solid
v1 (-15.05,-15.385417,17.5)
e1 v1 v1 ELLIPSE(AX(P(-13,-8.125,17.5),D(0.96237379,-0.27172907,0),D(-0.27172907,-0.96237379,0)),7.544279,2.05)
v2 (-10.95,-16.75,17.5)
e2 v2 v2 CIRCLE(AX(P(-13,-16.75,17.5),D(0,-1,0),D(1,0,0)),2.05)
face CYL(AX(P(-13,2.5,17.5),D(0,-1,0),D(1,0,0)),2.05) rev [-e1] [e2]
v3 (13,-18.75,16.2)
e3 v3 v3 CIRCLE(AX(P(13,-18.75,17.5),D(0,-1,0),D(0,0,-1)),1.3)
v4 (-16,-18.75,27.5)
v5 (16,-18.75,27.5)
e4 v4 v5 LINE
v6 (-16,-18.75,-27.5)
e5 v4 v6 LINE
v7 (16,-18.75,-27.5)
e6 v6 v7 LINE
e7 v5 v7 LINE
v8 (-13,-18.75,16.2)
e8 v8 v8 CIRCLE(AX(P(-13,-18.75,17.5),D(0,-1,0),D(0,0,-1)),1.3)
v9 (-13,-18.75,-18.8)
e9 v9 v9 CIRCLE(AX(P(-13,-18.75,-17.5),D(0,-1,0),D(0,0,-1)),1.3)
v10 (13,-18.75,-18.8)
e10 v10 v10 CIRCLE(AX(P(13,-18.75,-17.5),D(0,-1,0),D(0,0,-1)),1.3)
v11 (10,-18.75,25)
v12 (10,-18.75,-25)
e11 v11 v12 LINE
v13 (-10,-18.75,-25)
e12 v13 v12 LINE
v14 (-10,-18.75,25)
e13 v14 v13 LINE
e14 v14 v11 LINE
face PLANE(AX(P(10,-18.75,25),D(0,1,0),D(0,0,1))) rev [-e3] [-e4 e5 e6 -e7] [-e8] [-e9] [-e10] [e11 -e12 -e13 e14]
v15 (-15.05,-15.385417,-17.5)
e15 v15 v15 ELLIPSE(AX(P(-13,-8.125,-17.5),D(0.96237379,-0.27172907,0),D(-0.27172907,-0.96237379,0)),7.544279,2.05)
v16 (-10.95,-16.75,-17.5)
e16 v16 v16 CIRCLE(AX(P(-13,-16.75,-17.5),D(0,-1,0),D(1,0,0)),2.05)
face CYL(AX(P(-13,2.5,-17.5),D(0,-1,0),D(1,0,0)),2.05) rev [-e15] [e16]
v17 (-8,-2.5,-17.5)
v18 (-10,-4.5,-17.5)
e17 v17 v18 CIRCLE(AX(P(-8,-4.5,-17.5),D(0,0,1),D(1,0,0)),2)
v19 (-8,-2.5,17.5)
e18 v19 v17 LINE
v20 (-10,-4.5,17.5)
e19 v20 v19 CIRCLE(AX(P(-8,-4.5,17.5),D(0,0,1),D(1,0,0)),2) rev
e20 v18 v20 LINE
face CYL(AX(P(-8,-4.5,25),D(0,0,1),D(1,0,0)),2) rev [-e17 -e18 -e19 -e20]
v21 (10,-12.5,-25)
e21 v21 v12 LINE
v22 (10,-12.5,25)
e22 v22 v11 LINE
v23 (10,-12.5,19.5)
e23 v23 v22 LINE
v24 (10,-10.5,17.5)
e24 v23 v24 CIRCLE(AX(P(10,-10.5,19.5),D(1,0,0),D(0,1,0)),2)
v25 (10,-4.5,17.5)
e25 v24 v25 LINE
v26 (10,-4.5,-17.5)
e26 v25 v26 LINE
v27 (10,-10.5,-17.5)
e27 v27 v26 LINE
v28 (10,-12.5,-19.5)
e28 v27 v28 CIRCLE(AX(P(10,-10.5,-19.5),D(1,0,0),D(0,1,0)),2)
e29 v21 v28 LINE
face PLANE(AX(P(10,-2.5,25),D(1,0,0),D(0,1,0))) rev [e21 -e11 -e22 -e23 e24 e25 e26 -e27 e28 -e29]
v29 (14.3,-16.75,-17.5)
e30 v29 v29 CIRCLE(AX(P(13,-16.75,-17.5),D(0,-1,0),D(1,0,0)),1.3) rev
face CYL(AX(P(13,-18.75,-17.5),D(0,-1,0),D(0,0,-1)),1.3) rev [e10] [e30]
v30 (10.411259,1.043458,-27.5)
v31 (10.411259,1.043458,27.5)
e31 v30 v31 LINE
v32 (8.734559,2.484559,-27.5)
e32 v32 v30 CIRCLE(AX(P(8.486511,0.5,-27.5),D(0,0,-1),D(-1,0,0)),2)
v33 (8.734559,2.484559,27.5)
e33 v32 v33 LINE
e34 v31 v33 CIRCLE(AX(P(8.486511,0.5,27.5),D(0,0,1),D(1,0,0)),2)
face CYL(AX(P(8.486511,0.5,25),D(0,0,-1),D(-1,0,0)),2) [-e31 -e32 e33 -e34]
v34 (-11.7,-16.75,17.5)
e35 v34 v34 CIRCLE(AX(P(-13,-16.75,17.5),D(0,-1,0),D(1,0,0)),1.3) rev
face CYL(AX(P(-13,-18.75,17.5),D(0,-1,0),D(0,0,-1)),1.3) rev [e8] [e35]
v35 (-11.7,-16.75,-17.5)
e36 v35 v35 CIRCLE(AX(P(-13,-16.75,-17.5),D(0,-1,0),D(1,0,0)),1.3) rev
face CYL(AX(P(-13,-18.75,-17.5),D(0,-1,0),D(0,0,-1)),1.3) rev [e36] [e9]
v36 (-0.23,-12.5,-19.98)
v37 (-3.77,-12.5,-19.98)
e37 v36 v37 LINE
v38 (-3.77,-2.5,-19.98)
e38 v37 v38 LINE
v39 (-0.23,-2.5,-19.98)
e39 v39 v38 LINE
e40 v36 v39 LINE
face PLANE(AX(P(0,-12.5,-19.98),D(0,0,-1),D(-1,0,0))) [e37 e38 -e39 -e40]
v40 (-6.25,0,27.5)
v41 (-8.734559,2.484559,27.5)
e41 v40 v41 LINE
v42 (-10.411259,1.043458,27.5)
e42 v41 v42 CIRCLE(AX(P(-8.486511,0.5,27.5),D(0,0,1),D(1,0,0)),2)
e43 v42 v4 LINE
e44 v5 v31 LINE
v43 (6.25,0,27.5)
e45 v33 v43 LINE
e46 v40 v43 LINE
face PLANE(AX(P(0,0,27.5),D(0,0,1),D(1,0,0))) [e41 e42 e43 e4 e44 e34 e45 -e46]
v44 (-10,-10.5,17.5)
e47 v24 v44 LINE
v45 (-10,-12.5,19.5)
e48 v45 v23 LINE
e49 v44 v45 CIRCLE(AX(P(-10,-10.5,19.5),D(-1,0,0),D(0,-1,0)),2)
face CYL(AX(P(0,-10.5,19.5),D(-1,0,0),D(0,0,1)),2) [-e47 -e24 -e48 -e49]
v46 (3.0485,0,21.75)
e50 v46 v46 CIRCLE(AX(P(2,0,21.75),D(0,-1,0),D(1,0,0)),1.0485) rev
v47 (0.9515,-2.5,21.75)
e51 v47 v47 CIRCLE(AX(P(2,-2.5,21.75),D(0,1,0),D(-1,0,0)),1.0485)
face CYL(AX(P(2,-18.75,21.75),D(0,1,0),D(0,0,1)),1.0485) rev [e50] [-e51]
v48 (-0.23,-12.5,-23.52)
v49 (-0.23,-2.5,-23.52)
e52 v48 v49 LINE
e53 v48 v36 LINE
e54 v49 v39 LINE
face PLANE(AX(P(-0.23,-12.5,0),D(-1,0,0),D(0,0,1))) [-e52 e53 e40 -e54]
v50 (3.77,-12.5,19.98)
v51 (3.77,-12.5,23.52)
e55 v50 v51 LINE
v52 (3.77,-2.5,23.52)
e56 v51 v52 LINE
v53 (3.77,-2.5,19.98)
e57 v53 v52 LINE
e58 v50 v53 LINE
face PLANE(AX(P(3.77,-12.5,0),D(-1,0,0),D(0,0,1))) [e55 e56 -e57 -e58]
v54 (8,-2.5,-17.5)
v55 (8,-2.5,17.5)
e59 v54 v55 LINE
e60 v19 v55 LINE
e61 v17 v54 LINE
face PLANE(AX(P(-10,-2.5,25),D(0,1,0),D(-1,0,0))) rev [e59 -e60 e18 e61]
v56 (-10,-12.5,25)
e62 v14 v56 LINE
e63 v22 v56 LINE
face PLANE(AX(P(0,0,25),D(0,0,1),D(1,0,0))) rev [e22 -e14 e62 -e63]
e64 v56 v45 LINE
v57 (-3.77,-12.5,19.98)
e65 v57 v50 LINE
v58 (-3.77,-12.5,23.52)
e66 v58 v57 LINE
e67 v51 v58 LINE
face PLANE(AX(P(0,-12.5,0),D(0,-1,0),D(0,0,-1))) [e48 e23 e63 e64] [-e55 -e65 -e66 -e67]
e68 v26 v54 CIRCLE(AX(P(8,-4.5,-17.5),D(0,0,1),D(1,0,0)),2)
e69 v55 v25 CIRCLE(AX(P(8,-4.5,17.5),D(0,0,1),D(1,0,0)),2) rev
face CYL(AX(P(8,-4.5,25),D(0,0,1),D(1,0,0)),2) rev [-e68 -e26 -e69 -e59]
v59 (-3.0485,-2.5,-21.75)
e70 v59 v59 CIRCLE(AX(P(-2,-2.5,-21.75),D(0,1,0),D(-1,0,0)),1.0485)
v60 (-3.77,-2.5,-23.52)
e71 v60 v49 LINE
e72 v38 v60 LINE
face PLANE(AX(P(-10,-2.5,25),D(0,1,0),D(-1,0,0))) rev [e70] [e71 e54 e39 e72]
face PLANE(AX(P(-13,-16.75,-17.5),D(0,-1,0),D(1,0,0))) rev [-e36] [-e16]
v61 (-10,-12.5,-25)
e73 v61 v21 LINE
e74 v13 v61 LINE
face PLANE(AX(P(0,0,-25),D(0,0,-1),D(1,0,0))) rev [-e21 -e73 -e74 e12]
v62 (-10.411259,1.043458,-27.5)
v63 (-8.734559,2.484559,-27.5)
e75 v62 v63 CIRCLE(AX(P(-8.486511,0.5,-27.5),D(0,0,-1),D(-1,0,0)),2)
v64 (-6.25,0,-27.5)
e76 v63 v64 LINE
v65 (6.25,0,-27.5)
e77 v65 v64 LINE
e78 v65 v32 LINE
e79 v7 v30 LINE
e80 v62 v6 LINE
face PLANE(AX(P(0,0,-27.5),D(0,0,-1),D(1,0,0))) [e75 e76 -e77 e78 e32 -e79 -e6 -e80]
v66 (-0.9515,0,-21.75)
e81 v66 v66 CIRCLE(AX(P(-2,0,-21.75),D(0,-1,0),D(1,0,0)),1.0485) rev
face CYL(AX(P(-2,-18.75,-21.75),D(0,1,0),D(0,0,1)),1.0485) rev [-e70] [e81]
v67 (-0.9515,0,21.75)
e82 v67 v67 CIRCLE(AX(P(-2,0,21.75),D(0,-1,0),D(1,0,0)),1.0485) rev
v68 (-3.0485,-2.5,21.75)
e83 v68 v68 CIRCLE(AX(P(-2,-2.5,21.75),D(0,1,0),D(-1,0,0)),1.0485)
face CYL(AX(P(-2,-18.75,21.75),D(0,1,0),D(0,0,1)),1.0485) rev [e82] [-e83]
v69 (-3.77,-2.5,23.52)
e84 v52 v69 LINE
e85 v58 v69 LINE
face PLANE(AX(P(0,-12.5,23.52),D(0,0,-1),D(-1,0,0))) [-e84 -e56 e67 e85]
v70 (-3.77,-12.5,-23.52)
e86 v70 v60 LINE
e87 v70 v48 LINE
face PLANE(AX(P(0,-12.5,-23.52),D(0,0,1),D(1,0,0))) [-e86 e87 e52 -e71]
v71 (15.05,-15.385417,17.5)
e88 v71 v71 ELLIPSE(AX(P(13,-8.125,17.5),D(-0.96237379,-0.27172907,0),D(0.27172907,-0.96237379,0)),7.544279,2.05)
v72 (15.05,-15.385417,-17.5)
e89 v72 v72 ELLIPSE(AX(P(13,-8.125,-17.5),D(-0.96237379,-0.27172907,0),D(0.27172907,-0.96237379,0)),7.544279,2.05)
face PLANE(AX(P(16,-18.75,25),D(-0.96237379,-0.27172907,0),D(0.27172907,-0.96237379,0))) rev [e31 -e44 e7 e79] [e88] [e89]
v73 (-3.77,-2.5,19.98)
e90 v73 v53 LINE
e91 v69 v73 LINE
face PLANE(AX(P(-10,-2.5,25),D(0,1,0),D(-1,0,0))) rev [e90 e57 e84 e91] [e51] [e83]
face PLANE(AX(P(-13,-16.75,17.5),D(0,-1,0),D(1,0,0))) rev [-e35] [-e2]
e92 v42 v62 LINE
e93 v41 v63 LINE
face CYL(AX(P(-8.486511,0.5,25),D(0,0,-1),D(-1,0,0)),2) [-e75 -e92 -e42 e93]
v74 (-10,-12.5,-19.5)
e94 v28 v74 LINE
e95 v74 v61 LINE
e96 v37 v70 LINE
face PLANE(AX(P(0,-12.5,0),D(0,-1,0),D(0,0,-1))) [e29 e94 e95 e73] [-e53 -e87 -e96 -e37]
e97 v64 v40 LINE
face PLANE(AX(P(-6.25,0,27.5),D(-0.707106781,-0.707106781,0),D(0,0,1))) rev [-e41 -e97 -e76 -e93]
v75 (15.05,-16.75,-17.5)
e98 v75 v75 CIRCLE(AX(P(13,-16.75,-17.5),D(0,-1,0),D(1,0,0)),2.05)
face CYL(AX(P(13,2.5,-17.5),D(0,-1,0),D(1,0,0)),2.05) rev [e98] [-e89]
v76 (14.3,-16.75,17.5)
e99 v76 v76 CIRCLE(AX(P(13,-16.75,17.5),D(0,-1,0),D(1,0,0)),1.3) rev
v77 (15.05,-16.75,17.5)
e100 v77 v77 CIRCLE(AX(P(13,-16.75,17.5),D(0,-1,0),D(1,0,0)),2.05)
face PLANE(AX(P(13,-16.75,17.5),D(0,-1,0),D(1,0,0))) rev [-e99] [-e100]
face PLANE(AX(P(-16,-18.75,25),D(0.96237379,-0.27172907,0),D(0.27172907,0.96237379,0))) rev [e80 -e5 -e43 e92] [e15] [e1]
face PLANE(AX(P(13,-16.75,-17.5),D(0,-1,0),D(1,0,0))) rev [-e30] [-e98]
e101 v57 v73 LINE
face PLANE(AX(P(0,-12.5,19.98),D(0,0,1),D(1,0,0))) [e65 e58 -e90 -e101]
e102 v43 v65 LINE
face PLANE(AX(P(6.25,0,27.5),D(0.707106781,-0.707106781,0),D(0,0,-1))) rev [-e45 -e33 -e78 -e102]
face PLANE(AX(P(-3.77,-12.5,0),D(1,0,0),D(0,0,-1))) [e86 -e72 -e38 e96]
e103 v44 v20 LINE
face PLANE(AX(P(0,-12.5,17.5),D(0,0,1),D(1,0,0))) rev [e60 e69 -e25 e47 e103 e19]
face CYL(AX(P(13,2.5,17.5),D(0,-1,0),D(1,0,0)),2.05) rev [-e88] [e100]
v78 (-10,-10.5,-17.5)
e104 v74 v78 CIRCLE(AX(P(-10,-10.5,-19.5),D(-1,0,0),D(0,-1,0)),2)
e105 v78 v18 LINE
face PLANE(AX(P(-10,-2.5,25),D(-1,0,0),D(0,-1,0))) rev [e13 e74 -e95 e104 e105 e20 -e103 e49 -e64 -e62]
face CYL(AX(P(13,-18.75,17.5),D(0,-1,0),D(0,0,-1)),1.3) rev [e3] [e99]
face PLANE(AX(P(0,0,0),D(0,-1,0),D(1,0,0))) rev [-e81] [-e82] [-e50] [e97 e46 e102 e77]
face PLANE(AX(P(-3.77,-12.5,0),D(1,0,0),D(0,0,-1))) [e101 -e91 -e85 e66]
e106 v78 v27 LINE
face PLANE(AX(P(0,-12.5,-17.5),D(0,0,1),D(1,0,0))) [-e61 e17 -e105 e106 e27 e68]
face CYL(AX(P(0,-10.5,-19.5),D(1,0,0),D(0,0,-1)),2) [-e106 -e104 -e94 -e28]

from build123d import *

# Parameters (mm, degrees)
BOSS_EXTRUDE1_DEPTH  = 25
BOSS_EXTRUDE2_DEPTH  = 2.5
SKETCH5_W            = 20
SKETCH5_H            = 7.5
SKETCH5_W_2          = 7.54
SKETCH5_H_2          = 3.54
SKETCH5_W_3          = 3.54
BOSS_EXTRUDE3_DEPTH  = 10
SKETCH6_R            = 1.0485
CUT_EXTRUDE1_DEPTH   = 39.259802665
FILLET1_R            = 2
M2_CLEARANCE_HOLE1_D = 2.6
SKETCH9_R            = 2.05
CUT_EXTRUDE4_DEPTH   = 38.186186952
SKETCH10_W           = 12.5
SKETCH10_H           = 55
CUT_EXTRUDE5_DEPTH   = 2.5
CHAMFER1_SIZE        = 2.5


with BuildPart() as part:
    # Sketch2 → Boss-Extrude1 (new, symmetric)
    with BuildSketch(Plane.XY):
        Polygon((10, -2.5), (10, -18.75), (16, -18.75), (10, 2.5), (-10, 2.5), (-16, -18.75), (-10, -18.75), (-10, -2.5), align=None)
    extrude(amount=BOSS_EXTRUDE1_DEPTH, both=True)

    # Sketch3 → Boss-Extrude2 (add)
    with BuildSketch(Plane.XY.offset(25)):
        Polygon((-10, -18.75), (10, -18.75), (16, -18.75), (10, 2.5), (-10, 2.5), (-16, -18.75), align=None)
    boss_extrude2 = extrude(amount=BOSS_EXTRUDE2_DEPTH)

    # Mirror1: Boss-Extrude2 across plane
    add(boss_extrude2.mirror(Plane.XY))

    # Sketch5 → Boss-Extrude3 (add)
    # profile 1 of 2: a face of its own
    with BuildSketch(Plane.XZ.offset(2.5)):
        with Locations((0, 21.25)):
            Rectangle(SKETCH5_W, SKETCH5_H)
        with Locations((0, 21.75)):
            Rectangle(SKETCH5_W_2, SKETCH5_H_2, mode=Mode.SUBTRACT)
    # profile 2 of 2: a face of its own
    with BuildSketch(Plane.XZ.offset(2.5)):
        with Locations((0, -21.25)):
            Rectangle(SKETCH5_W, SKETCH5_H)
        with Locations((-2, -21.75)):
            Rectangle(SKETCH5_W_3, SKETCH5_H_2, mode=Mode.SUBTRACT)
    extrude(amount=BOSS_EXTRUDE3_DEPTH)

    # Sketch6 → Cut-Extrude1 (cut, through all)
    with BuildSketch(Plane(origin=(0, 2.5, 0), x_dir=(1, 0, 0), z_dir=(0, 1, 0))):
        with Locations(Location((-2, 21.75, 0), (0, 0, 270))):
            Circle(SKETCH6_R)
        with Locations(Location((-2, -21.75, 0), (0, 0, 270))):
            Circle(SKETCH6_R)
        with Locations(Location((2, -21.75, 0), (0, 0, 270))):
            Circle(SKETCH6_R)
    extrude(amount=-CUT_EXTRUDE1_DEPTH, mode=Mode.SUBTRACT)

    # Fillet1
    fillet1_edges = [part.edges().sort_by_distance(p)[0] for p in [
        (-10, 2.5, 0),
        (10, 2.5, 0),
        (10, -2.5, 0),
        (-10, -2.5, 0),
        (0, -12.5, 17.5),
        (0, -12.5, -17.5),
    ]]
    fillet(fillet1_edges, radius=FILLET1_R)

    # M2 Clearance Hole1 (through all)
    with Locations(Plane.XZ.offset(18.75)):
        with Locations((-13, 17.5), (13, 17.5), (13, -17.5), (-13, -17.5)):
            Hole(M2_CLEARANCE_HOLE1_D / 2)

    # Sketch9 → Cut-Extrude4 (cut, through all)
    with BuildSketch(Plane.XZ.offset(16.75)):
        with Locations((-13, -17.5)):
            Circle(SKETCH9_R)
        with Locations((13, -17.5)):
            Circle(SKETCH9_R)
        with Locations((13, 17.5)):
            Circle(SKETCH9_R)
        with Locations((-13, 17.5)):
            Circle(SKETCH9_R)
    extrude(amount=-CUT_EXTRUDE4_DEPTH, mode=Mode.SUBTRACT)

    # Sketch10 → Cut-Extrude5 (cut)
    with BuildSketch(Plane(origin=(0, 2.5, 0), x_dir=(1, 0, 0), z_dir=(0, 1, 0))):
        Rectangle(SKETCH10_W, SKETCH10_H)
    extrude(amount=-CUT_EXTRUDE5_DEPTH, mode=Mode.SUBTRACT)

    # Chamfer1
    # the kernel refuses this chamfer: 2.5 mm, written as the material it takes off along each edge
    with BuildSketch(Plane(origin=(6.25, 2.5, 33.92920747), x_dir=(-0.027495876610586317, -0.9996219169112968, 0), z_dir=(0, 0, -1))) as chamfer1_piece_1_section:
        Polygon((CHAMFER1_SIZE * 0.999621916911, -CHAMFER1_SIZE * 0.0274958766106), (-CHAMFER1_SIZE * 0.0274958766106, -CHAMFER1_SIZE * 0.999621916911), (0, 0), align=None)
    chamfer1_piece_1 = extrude(amount=67.85841494, mode=Mode.PRIVATE)
    chamfer1_piece_1 = split(chamfer1_piece_1, bisect_by=Plane(origin=(7.076010386, 0, 0), z_dir=(0, 1, 0)), keep=Keep.TOP, mode=Mode.PRIVATE)
    add(chamfer1_piece_1, mode=Mode.SUBTRACT)
    with BuildSketch(Plane(origin=(-6.25, 2.5, -33.92920747), x_dir=(-0.9996219169112968, 0.02749587661058649, 0), z_dir=(0, 0, 1))) as chamfer1_piece_2_section:
        Polygon((CHAMFER1_SIZE * 0.999621916911, CHAMFER1_SIZE * 0.0274958766106), (-CHAMFER1_SIZE * 0.0274958766106, CHAMFER1_SIZE * 0.999621916911), (0, 0), align=None)
    chamfer1_piece_2 = extrude(amount=67.85841494, mode=Mode.PRIVATE)
    chamfer1_piece_2 = split(chamfer1_piece_2, bisect_by=Plane(origin=(-7.076010386, 0, 0), z_dir=(0, 1, 0)), keep=Keep.TOP, mode=Mode.PRIVATE)
    add(chamfer1_piece_2, mode=Mode.SUBTRACT)


solid = part.part
